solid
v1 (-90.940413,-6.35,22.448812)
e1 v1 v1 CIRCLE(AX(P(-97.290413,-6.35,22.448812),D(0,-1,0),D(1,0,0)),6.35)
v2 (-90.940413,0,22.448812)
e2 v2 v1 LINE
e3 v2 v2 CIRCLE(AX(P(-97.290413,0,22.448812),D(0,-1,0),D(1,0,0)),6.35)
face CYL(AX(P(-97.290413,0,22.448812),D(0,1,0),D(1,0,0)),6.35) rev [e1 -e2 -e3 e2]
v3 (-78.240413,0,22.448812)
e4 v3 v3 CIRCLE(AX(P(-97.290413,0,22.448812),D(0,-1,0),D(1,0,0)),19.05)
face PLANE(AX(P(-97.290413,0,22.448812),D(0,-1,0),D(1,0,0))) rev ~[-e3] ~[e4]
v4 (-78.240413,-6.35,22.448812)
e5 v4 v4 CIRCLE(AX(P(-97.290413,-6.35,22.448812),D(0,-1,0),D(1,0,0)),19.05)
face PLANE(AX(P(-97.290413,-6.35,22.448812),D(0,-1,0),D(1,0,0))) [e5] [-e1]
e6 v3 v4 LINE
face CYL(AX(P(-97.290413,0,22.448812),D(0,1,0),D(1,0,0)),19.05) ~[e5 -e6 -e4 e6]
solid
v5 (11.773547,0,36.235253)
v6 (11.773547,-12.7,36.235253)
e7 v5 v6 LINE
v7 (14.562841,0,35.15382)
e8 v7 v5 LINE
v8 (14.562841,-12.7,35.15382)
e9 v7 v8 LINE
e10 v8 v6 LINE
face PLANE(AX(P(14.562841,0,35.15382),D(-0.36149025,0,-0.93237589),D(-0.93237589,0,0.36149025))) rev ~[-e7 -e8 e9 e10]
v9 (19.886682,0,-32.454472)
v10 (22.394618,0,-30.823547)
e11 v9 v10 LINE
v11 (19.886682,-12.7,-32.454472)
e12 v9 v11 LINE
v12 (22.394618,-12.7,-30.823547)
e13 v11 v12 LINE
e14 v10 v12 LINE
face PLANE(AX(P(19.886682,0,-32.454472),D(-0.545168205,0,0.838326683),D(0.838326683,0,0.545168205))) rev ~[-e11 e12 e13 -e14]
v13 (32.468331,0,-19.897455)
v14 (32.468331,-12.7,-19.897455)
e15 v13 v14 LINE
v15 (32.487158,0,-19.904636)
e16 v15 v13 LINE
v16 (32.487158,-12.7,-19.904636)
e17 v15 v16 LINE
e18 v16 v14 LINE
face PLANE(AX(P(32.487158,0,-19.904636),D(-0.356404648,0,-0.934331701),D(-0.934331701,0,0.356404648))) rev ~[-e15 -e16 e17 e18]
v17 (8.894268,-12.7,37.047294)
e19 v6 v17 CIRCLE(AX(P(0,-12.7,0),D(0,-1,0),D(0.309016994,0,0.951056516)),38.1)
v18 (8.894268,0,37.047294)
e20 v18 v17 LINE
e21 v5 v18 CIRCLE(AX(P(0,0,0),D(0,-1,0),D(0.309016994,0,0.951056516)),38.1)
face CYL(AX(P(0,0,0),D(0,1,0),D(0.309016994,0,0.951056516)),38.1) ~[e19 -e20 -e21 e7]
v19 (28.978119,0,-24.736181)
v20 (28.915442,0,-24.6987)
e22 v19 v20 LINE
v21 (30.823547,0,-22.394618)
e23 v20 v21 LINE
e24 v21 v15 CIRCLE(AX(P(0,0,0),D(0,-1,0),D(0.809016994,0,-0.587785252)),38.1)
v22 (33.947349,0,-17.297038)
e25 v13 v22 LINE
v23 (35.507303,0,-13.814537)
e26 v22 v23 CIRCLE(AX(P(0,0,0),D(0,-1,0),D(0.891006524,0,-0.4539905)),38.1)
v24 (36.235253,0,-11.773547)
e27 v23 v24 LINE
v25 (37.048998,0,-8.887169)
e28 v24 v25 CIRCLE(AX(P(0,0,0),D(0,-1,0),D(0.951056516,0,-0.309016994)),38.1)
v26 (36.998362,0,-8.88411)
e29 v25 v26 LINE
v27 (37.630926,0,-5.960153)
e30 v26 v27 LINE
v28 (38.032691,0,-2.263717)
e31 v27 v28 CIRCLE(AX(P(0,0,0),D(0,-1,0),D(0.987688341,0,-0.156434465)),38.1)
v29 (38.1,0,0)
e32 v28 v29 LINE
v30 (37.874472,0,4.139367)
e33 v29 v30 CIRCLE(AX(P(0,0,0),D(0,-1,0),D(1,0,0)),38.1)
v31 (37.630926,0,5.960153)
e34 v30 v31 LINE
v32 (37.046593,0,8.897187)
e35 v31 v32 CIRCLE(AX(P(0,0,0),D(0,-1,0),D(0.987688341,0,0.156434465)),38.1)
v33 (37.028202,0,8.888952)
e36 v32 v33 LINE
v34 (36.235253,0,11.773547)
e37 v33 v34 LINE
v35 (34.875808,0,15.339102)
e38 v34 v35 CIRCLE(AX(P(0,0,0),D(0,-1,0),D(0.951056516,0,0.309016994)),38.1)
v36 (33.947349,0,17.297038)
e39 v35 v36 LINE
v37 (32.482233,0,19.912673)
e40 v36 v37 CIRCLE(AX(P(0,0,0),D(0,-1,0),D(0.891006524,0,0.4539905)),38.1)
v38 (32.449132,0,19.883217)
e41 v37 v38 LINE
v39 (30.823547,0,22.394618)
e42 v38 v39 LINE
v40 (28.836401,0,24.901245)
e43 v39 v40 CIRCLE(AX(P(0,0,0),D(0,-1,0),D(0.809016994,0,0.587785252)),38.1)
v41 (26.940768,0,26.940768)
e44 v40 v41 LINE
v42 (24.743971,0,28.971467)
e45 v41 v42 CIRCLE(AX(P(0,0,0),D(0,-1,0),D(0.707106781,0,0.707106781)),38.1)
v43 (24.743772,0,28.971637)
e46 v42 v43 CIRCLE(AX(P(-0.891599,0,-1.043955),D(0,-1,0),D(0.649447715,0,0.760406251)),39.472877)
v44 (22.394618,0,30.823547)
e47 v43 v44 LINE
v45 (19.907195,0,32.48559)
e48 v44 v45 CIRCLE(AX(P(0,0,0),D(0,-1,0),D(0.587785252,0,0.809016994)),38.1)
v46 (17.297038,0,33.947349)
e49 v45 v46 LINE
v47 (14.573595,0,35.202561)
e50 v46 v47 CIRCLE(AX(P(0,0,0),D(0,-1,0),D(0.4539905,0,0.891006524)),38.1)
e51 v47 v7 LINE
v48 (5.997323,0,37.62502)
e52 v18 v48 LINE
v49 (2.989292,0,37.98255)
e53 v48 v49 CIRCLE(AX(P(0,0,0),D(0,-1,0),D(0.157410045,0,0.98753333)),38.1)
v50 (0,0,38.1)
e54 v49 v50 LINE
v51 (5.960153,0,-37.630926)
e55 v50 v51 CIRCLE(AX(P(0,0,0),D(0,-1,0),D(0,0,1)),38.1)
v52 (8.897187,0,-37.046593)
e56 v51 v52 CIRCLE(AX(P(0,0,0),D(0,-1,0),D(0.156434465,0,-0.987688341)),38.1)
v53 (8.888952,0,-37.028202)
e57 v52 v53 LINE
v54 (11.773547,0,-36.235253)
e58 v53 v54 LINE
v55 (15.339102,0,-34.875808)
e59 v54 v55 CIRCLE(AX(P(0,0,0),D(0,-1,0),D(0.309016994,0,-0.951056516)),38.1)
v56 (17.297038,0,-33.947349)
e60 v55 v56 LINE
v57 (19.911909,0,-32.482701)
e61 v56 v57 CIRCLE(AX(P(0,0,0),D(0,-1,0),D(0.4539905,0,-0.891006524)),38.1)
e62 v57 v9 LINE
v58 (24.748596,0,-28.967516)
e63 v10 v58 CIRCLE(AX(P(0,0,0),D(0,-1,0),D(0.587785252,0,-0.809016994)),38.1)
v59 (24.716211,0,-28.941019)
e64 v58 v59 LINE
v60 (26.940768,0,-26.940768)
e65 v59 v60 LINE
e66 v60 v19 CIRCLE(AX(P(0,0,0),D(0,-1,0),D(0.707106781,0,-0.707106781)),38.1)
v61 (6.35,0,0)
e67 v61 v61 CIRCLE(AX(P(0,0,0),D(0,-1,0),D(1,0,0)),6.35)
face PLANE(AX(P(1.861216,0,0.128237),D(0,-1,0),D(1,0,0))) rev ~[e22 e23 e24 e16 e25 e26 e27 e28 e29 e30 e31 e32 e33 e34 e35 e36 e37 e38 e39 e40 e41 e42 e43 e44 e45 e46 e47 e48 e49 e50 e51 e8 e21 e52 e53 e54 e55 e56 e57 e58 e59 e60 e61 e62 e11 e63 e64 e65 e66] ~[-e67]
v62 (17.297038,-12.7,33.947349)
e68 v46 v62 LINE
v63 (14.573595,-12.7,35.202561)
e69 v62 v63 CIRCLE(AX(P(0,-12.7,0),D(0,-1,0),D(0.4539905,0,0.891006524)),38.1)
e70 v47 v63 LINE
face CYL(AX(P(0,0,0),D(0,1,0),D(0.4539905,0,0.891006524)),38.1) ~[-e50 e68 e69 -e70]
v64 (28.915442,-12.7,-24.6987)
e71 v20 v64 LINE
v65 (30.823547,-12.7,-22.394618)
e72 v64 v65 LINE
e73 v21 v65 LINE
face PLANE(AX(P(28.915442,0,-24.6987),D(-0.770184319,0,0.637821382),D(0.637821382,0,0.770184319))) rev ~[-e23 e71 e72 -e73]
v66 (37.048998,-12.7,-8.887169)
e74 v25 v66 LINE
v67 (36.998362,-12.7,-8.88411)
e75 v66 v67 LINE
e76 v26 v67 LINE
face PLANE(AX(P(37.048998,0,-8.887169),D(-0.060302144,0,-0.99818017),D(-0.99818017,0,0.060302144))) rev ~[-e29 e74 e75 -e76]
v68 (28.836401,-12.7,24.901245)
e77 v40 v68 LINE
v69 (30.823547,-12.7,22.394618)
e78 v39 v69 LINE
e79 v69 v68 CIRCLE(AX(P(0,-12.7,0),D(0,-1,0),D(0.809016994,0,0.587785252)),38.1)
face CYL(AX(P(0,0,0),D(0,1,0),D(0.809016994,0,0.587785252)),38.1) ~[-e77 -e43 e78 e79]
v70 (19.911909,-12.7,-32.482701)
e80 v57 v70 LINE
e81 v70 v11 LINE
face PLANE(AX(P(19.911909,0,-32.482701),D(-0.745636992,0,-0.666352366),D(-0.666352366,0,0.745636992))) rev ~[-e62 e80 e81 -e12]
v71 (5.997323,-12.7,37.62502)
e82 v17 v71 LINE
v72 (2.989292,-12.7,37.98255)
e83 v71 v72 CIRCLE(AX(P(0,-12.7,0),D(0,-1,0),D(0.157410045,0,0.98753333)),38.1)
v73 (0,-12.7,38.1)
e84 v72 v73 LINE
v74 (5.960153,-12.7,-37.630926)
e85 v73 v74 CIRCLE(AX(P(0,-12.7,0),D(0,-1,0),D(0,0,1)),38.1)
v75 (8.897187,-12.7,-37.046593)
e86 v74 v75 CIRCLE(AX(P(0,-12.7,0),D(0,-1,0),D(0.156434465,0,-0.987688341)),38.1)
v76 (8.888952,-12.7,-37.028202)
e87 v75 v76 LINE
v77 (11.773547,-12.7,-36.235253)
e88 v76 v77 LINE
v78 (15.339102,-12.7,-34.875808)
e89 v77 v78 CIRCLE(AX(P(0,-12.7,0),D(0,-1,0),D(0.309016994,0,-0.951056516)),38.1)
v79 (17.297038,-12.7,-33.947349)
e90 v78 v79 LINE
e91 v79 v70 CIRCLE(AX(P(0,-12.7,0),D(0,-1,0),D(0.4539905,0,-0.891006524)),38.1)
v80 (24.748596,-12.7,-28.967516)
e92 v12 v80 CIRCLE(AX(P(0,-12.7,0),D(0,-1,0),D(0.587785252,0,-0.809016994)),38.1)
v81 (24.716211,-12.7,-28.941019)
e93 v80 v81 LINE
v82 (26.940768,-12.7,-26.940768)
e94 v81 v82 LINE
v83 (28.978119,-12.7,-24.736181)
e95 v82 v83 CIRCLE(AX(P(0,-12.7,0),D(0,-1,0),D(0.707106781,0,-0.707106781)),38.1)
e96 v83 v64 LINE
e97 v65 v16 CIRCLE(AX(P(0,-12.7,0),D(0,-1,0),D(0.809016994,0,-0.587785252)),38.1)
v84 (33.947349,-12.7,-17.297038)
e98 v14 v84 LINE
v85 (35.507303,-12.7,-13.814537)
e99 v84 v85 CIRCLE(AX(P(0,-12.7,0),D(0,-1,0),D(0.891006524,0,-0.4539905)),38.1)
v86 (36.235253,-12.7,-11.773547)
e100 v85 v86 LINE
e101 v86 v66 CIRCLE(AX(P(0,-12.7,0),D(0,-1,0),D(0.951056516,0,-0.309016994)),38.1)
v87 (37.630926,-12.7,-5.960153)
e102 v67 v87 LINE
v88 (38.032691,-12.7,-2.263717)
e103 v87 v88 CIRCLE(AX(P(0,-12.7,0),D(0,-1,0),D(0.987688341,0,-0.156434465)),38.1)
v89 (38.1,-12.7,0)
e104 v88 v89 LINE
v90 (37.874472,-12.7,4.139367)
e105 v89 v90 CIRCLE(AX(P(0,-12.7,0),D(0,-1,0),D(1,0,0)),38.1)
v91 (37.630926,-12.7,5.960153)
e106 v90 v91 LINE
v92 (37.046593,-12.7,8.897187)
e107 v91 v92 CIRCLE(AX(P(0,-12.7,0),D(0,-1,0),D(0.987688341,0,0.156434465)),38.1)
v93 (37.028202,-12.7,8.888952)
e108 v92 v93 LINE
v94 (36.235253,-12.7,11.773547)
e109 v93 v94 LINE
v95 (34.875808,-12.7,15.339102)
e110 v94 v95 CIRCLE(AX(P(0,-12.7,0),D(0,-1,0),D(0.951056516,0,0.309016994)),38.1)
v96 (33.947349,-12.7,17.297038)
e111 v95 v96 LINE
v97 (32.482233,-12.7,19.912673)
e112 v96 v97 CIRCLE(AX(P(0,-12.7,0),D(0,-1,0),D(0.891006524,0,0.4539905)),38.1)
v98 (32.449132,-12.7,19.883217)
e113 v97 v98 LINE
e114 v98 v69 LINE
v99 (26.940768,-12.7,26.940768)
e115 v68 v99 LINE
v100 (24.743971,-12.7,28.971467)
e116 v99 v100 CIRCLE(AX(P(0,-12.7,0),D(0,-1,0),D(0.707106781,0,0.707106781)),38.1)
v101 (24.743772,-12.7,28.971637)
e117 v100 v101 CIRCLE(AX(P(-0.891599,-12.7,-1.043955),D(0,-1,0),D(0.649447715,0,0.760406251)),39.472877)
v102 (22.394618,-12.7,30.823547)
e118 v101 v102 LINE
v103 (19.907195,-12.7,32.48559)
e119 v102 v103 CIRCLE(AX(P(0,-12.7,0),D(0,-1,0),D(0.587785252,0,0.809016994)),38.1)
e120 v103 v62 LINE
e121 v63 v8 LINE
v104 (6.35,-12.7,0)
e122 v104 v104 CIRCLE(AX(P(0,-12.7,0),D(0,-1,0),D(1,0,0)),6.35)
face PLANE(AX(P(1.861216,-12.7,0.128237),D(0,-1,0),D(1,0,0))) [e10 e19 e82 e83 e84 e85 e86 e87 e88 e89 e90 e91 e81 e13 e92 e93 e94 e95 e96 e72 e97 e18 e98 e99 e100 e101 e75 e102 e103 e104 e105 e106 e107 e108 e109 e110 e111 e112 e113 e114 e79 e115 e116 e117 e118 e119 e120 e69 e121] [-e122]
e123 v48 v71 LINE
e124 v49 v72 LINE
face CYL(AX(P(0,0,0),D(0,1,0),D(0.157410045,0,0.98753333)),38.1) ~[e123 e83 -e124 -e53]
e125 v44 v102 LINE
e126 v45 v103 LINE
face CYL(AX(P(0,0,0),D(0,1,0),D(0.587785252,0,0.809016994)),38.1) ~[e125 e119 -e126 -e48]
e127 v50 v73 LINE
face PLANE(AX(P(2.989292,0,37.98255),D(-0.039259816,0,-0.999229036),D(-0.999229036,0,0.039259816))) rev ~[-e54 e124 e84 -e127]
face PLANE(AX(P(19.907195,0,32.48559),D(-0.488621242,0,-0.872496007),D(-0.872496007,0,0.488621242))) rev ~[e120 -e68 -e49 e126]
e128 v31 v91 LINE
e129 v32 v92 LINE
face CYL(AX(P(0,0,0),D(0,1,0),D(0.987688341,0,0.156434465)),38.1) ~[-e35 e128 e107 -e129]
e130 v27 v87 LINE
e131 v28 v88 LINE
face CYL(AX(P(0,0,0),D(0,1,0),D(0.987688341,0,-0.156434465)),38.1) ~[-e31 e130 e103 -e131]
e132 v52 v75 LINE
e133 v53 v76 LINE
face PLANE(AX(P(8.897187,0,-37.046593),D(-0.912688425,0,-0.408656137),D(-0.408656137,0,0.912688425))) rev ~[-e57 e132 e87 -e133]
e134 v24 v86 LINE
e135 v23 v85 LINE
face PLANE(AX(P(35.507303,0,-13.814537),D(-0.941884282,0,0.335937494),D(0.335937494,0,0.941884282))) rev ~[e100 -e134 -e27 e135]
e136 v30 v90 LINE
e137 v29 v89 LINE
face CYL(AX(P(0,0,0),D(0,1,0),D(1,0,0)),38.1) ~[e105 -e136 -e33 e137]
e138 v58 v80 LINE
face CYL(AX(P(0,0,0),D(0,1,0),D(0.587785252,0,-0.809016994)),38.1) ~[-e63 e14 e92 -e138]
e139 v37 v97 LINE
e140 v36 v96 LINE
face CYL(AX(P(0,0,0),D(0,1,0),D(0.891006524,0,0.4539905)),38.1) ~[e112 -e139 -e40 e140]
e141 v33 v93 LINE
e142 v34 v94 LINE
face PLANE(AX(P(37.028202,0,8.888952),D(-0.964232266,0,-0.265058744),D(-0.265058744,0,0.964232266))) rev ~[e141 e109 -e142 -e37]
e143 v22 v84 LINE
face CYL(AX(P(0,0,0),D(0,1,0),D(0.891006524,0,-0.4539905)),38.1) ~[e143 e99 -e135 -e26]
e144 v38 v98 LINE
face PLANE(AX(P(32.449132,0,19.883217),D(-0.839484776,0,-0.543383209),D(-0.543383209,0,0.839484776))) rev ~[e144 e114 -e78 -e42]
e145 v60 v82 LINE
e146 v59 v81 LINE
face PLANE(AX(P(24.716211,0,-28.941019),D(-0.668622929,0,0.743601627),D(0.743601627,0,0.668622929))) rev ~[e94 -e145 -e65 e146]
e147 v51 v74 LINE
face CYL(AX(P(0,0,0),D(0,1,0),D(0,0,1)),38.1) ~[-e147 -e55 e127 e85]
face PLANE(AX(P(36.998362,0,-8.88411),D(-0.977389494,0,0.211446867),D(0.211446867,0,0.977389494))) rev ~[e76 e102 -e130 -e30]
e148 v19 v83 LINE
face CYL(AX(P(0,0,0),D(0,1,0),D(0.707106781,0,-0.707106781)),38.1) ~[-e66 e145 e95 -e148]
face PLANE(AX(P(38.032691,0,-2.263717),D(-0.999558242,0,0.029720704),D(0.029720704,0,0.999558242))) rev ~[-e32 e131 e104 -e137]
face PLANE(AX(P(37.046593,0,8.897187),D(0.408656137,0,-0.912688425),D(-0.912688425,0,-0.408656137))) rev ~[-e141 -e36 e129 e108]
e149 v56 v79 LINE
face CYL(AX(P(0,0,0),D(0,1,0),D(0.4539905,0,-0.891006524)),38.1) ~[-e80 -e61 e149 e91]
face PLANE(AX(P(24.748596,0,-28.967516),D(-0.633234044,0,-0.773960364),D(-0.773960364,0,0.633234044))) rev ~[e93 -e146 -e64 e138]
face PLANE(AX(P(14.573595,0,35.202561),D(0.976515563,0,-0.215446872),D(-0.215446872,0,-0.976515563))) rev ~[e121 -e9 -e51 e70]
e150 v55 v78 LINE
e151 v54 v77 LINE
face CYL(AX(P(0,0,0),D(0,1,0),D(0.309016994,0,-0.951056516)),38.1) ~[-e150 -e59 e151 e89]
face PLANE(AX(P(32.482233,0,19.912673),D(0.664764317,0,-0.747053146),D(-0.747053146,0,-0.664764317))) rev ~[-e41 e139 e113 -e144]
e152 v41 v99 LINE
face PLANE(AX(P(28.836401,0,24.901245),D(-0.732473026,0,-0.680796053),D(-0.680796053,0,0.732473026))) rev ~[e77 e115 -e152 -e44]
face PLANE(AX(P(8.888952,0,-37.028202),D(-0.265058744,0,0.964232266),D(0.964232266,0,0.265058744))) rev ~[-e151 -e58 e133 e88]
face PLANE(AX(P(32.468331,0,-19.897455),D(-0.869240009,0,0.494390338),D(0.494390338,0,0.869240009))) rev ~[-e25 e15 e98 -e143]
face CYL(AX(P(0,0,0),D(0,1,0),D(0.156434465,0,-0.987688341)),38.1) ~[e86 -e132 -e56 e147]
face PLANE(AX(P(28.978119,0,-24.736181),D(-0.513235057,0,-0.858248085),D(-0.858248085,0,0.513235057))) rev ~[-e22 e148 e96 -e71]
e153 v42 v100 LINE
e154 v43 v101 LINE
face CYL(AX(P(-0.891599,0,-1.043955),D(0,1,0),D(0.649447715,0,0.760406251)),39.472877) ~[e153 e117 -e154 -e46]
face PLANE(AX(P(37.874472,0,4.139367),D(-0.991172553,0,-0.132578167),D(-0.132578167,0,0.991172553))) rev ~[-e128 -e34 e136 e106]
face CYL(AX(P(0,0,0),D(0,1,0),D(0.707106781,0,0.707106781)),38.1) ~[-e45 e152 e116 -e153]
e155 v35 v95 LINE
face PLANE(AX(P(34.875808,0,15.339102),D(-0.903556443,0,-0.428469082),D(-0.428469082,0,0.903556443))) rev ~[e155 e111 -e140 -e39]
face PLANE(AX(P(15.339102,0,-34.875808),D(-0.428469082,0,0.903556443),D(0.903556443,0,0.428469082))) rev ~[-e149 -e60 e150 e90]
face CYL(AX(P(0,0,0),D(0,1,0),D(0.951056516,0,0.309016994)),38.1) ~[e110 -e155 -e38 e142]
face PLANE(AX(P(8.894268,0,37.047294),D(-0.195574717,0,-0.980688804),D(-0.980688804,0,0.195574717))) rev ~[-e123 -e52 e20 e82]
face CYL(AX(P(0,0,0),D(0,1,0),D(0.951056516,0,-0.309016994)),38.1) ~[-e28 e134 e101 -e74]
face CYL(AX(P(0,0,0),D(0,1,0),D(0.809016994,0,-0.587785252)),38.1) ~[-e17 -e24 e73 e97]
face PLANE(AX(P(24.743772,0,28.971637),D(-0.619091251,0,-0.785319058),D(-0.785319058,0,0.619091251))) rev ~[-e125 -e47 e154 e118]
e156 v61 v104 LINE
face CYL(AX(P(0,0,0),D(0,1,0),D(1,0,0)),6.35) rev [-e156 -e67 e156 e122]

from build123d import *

# Parameters (mm, degrees)
F0_R     = 6.35
F1_DEPTH = 12.7
F2_R     = 19.05
F2_R_2   = 6.35
F3_DEPTH = 6.35


# Not quite as in the source:
# - ends of sketch curves that miss each other by under 0.0002 mm in the source are joined
# - a feature names something its author has since deleted; it is built from what else it names


with BuildPart() as f1:
    # F0 (on Front) → F1 (new body)
    with BuildSketch(Plane.XZ):
        with BuildLine():
            Line((28.8364005243, 24.9012450452), (26.9407683632, 26.9407683632))
            ThreePointArc((26.9407683632, 26.9407683632), (25.8623084048, 27.9776876095), (24.7439706414, 28.9714672894))
            ThreePointArc((24.7439706414, 28.9714672894), (24.7438711101, 28.9715522968), (24.7437715786, 28.9716373038))
            Line((24.7437715786, 28.9716373038), (22.3946181123, 30.8235474857))
            ThreePointArc((22.3946181123, 30.8235474857), (21.167225878, 31.6789922287), (19.9071953157, 32.4855902619))
            Line((19.9071953157, 32.4855902619), (17.2970380401, 33.9473485716))
            ThreePointArc((17.2970380401, 33.9473485716), (15.9476707836, 34.6017600214), (14.5735950651, 35.2025613682))
            Line((14.5735950651, 35.2025613682), (14.5628412955, 35.1538197769))
            Line((14.5628412955, 35.1538197769), (11.7735474857, 36.2352532708))
            ThreePointArc((11.7735474857, 36.2352532708), (10.3418811399, 36.6695445089), (8.8942683629, 37.0472939672))
            Line((8.8942683629, 37.0472939672), (5.9973227219, 37.6250198694))
            ThreePointArc((5.9973227219, 37.6250198694), (4.4968617978, 37.8336917835), (2.9892915472, 37.9825504152))
            Line((2.9892915472, 37.9825504152), (0, 38.1))
            ThreePointArc((0, 38.1), (-37.9825504152, -2.9892915472), (5.960153118, -37.6309257767))
            ThreePointArc((5.960153118, -37.6309257767), (7.4344130557, -37.3676263966), (8.8971866639, -37.0465932235))
            Line((8.8971866639, -37.0465932235), (8.8889522061, -37.0282024699))
            Line((8.8889522061, -37.0282024699), (11.7735474857, -36.2352532708))
            ThreePointArc((11.7735474857, -36.2352532708), (13.5733548782, -35.6001971533), (15.3391019224, -34.8758075493))
            Line((15.3391019224, -34.8758075493), (17.2970380401, -33.9473485716))
            ThreePointArc((17.2970380401, -33.9473485716), (18.6188813116, -33.2407469637), (19.9119094402, -32.4827009721))
            Line((19.9119094402, -32.4827009721), (19.8866817155, -32.4544715762))
            Line((19.8866817155, -32.4544715762), (22.3946181123, -30.8235474857))
            ThreePointArc((22.3946181123, -30.8235474857), (23.5898681595, -29.91869182), (24.7485963101, -28.9675159563))
            Line((24.7485963101, -28.9675159563), (24.716211253, -28.9410193531))
            Line((24.716211253, -28.9410193531), (26.9407683632, -26.9407683632))
            ThreePointArc((26.9407683632, -26.9407683632), (27.9811639514, -25.8585472122), (28.9781187619, -24.7361806474))
            Line((28.9781187619, -24.7361806474), (28.9154423412, -24.6986999505))
            Line((28.9154423412, -24.6986999505), (30.8235474857, -22.3946181123))
            ThreePointArc((30.8235474857, -22.3946181123), (31.6798259077, -21.1659781361), (32.4871583117, -19.9046362646))
            Line((32.4871583117, -19.9046362646), (32.4683314442, -19.897454679))
            Line((32.4683314442, -19.897454679), (33.9473485716, -17.2970380401))
            ThreePointArc((33.9473485716, -17.2970380401), (34.7709520965, -15.5753295408), (35.5073030041, -13.8145370308))
            Line((35.5073030041, -13.8145370308), (36.2352532708, -11.7735474857))
            ThreePointArc((36.2352532708, -11.7735474857), (36.670535285, -10.3383674684), (37.0489977594, -8.8871685607))
            Line((37.0489977594, -8.8871685607), (36.998361761, -8.8841095345))
            Line((36.998361761, -8.8841095345), (37.6309257767, -5.960153118))
            ThreePointArc((37.6309257767, -5.960153118), (37.8769274813, -4.1168391485), (38.0326909965, -2.2637171999))
            Line((38.0326909965, -2.2637171999), (38.1, 0))
            ThreePointArc((38.1, 0), (38.0435762549, 2.0727531781), (37.8744721398, 4.1393671175))
            Line((37.8744721398, 4.1393671175), (37.6309257767, 5.960153118))
            ThreePointArc((37.6309257767, 5.960153118), (37.3676263966, 7.4344130557), (37.0465932235, 8.8971866639))
            Line((37.0465932235, 8.8971866639), (37.0282024699, 8.8889522061))
            Line((37.0282024699, 8.8889522061), (36.2352532708, 11.7735474857))
            ThreePointArc((36.2352532708, 11.7735474857), (35.6001971533, 13.5733548782), (34.8758075493, 15.3391019224))
            Line((34.8758075493, 15.3391019224), (33.9473485716, 17.2970380401))
            ThreePointArc((33.9473485716, 17.2970380401), (33.24052825, 18.6192717812), (32.4822331625, 19.9126725674))
            Line((32.4822331625, 19.9126725674), (32.4491315845, 19.8832171692))
            Line((32.4491315845, 19.8832171692), (30.8235474857, 22.3946181123))
            ThreePointArc((30.8235474857, 22.3946181123), (29.8562915276, 23.6687949887), (28.8364005243, 24.9012450452))
        make_face()
        Circle(F0_R, mode=Mode.SUBTRACT)
    extrude(amount=F1_DEPTH)


with BuildPart() as f3:
    # F2 (on Front) → F3 (new body)
    with BuildSketch(Plane.XZ):
        with Locations((-97.2904128466, 22.4488124817)):
            Circle(F2_R)
        with Locations((-97.2904128466, 22.4488124817)):
            Circle(F2_R_2, mode=Mode.SUBTRACT)
    extrude(amount=F3_DEPTH)


solid = Compound([f1.part, f3.part])
